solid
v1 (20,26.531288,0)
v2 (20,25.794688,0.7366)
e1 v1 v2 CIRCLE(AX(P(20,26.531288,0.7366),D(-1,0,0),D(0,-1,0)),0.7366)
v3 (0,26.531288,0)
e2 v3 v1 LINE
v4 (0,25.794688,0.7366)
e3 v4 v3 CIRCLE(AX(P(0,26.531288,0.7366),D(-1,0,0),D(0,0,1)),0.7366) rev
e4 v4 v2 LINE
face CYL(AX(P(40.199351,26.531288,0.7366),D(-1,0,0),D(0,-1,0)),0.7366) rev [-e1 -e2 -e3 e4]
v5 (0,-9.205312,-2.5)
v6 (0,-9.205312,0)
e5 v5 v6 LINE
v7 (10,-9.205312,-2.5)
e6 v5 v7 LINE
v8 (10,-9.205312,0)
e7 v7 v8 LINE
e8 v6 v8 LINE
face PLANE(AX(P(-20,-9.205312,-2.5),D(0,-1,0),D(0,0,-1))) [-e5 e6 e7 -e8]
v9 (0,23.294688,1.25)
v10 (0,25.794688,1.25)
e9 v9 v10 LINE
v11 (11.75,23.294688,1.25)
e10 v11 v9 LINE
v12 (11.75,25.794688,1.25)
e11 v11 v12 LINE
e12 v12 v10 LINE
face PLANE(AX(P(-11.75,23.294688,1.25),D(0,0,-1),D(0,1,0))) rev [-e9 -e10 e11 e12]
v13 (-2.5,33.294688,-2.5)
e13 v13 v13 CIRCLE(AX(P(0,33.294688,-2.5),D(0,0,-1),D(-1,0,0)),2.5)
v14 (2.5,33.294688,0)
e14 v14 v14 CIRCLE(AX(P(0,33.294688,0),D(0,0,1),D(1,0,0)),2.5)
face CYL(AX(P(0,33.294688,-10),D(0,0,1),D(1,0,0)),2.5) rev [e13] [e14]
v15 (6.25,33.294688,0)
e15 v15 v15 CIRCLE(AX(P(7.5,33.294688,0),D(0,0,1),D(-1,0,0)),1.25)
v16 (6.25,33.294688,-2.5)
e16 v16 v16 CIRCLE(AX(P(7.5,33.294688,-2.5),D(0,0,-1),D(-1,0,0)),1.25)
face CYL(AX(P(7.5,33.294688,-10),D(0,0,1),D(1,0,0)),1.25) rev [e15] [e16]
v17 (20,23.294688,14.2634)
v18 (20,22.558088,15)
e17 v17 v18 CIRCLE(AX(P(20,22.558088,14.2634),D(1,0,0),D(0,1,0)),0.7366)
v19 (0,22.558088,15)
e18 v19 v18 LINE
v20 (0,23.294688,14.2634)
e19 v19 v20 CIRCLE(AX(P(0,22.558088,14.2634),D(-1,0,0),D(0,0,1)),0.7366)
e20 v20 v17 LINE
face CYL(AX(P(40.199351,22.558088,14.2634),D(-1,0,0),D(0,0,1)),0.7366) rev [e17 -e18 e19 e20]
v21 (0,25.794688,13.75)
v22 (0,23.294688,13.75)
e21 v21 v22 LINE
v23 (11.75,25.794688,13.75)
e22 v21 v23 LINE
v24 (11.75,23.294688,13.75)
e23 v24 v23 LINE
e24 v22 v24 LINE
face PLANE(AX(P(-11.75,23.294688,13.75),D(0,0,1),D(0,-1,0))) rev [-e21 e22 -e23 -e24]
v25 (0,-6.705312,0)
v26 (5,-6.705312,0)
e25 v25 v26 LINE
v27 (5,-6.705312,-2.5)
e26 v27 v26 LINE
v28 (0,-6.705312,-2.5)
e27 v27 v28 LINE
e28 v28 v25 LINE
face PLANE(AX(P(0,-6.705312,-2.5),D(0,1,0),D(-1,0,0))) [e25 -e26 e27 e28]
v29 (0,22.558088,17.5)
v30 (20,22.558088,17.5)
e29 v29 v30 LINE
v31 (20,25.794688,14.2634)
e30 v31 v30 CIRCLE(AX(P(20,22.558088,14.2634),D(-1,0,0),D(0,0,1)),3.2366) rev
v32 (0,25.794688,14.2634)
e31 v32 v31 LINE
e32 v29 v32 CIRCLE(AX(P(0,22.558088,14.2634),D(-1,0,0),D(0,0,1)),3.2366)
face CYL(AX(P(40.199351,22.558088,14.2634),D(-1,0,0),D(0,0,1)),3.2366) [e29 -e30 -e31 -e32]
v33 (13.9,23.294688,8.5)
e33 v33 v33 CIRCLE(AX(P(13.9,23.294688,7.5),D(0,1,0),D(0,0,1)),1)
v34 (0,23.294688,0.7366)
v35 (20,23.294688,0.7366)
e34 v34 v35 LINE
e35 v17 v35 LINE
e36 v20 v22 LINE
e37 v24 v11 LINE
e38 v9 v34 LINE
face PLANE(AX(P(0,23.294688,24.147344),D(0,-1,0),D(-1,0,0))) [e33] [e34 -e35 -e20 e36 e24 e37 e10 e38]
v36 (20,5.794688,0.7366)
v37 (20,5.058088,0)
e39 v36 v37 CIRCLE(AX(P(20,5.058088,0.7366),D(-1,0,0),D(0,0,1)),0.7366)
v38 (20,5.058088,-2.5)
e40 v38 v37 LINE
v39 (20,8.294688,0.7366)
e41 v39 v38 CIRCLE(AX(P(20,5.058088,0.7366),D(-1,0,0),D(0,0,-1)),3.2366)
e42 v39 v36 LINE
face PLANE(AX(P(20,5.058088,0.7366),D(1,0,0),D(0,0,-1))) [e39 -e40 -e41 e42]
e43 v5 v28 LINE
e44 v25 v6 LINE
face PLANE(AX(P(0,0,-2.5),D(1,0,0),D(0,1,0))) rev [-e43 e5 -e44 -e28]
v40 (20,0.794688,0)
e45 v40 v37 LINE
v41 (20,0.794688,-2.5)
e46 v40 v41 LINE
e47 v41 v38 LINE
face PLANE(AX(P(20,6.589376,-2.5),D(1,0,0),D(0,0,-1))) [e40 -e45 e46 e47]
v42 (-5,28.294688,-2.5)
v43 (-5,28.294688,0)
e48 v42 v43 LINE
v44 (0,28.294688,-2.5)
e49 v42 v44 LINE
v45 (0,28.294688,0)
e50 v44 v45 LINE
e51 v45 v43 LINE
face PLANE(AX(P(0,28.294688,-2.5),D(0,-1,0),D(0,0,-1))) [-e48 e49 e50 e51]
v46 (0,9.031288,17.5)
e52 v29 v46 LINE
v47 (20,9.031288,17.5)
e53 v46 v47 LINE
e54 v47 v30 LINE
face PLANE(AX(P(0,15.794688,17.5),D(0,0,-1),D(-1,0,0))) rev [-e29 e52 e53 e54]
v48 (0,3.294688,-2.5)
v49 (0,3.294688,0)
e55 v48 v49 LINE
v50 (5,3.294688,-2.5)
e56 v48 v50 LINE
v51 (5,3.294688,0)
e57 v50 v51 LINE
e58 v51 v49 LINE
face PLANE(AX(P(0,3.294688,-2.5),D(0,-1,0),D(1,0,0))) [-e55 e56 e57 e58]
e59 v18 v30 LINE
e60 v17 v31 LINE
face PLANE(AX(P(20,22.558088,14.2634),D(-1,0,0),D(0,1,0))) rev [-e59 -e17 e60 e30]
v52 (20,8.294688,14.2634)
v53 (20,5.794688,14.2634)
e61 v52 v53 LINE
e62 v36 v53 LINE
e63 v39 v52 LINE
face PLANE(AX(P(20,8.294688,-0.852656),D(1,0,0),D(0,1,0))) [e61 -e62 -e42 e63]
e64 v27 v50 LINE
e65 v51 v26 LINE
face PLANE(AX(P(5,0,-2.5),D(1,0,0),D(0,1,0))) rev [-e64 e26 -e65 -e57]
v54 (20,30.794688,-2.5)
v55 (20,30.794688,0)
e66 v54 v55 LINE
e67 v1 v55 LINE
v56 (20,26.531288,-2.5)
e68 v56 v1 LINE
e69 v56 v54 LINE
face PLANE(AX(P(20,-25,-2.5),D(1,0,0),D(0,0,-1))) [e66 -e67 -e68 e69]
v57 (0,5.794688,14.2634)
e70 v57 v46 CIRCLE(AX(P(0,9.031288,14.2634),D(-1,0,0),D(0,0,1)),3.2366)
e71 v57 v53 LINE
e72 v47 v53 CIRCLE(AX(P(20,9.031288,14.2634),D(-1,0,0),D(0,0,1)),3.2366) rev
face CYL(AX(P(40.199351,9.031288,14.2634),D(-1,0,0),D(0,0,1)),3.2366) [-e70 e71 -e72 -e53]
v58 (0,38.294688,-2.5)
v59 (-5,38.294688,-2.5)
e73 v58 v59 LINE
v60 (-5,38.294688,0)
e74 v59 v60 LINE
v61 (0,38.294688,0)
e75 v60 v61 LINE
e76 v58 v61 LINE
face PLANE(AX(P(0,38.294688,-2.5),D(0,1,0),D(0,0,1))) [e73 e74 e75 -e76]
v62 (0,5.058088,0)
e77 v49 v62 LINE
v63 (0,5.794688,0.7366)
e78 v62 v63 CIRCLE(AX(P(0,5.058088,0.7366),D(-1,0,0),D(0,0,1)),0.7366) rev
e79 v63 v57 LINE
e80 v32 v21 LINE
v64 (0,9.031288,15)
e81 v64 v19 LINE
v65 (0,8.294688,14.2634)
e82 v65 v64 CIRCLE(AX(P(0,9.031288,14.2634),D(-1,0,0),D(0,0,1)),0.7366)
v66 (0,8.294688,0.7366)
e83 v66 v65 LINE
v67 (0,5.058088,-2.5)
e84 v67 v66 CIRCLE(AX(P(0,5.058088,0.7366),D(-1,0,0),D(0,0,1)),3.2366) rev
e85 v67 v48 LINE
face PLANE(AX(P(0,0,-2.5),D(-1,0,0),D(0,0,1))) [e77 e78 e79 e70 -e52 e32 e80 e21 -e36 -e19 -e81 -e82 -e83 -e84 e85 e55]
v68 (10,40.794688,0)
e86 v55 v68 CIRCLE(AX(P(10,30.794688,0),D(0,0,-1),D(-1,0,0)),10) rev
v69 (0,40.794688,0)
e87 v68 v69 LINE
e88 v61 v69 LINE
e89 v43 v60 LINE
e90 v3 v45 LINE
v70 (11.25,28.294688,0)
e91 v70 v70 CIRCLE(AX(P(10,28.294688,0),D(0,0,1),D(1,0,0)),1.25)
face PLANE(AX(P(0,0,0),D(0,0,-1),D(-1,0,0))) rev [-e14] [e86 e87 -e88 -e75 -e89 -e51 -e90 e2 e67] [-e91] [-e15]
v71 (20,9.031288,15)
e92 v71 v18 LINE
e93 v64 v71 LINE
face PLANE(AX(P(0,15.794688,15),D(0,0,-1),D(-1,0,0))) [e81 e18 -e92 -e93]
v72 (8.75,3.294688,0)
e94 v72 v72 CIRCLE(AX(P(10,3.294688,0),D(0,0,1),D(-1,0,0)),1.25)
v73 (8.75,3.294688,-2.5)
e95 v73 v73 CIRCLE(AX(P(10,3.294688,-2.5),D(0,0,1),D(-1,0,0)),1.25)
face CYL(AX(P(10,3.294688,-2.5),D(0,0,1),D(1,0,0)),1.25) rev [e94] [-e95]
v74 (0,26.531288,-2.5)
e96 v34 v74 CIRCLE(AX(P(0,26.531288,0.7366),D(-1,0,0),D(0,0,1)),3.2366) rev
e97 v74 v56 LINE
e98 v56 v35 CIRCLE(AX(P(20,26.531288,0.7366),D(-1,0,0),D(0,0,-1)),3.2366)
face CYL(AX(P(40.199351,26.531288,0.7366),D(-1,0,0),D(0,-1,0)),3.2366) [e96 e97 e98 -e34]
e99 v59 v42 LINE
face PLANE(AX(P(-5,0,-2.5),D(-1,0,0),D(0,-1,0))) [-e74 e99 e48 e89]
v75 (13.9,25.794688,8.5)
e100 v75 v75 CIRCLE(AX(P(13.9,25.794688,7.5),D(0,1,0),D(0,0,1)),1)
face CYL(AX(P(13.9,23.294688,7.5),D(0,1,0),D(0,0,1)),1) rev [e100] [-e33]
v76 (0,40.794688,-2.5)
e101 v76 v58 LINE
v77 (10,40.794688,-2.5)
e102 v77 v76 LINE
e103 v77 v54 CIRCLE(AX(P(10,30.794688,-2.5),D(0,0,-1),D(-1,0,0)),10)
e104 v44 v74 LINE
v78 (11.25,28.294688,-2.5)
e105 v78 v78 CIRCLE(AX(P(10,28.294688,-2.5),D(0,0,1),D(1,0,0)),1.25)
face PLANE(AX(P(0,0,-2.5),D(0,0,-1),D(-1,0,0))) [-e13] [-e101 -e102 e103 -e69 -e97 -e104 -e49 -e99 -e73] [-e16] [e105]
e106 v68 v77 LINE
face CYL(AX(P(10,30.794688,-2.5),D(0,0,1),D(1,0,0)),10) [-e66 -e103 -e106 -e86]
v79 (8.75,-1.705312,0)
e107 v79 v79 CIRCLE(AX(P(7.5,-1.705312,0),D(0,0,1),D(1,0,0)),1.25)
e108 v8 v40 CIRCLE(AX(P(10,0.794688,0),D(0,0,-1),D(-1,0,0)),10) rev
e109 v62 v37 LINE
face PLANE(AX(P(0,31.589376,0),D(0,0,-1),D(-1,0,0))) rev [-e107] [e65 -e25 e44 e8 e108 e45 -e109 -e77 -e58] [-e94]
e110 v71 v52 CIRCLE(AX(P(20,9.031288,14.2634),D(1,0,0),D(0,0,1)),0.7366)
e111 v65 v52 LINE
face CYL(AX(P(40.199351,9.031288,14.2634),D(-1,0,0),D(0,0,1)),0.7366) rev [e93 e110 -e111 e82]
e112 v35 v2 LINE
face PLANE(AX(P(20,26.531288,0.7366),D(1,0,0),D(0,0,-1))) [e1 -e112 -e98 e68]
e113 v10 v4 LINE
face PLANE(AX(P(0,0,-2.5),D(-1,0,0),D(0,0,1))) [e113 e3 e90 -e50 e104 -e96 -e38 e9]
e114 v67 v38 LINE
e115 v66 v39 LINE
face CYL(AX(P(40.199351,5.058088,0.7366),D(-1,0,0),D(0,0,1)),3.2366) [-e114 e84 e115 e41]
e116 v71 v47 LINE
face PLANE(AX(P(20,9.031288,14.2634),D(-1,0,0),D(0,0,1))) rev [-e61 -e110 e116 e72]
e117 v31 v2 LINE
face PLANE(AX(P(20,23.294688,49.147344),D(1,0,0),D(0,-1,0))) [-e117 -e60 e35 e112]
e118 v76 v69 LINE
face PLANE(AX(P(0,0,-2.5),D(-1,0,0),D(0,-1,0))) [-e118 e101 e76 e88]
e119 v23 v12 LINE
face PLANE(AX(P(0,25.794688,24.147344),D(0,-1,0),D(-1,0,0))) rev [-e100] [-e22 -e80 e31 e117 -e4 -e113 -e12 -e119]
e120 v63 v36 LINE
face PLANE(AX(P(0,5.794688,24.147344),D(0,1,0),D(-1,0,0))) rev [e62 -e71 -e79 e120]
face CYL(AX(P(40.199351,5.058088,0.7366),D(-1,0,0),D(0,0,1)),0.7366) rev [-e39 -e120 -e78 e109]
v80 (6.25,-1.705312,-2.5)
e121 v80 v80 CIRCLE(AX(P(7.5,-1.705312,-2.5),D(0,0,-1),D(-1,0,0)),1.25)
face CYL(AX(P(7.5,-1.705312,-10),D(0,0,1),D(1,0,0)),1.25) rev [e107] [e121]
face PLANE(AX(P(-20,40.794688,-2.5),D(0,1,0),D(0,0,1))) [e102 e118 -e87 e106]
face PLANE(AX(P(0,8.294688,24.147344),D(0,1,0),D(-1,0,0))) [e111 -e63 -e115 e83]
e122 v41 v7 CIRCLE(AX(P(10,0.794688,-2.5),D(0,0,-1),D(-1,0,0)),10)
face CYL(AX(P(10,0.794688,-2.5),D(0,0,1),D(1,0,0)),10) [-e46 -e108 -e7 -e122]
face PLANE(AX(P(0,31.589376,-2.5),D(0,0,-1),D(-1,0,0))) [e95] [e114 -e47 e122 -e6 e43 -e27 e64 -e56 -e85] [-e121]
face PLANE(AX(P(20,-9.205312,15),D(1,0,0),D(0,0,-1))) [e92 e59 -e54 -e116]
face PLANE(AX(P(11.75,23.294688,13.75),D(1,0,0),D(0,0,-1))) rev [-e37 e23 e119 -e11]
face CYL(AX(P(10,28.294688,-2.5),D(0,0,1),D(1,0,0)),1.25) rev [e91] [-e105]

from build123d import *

# Parameters (mm, degrees)
SKETCH1_W           = 40
SKETCH1_H           = 50
SKETCH1_R           = 1.25
BASE_FLANGE1_DEPTH  = 2.5
SKETCH15_R          = 1
CUT_EXTRUDE3_DEPTH  = 10
JOG3_START          = -2.5
JOG3_OUTLINE_W      = 40
JOG3_OUTLINE_H      = 48.294687966
JOG3_OUTLINE_R      = 1
JOG3_OUTLINE_R_2    = 1.25
JOG3_DEPTH          = 2.5
JOG3_2_OUTLINE_W    = 40
JOG3_2_OUTLINE_H    = 1.705312034
JOG3_2_DEPTH        = 0.332528284
JOG3_START_2        = 14.2634
JOG3_3_OUTLINE_W    = 40
JOG3_3_OUTLINE_H    = 35
JOG3_3_OUTLINE_R    = 1
JOG3_3_OUTLINE_R_2  = 1.25
JOG3_3_DEPTH        = 3.2366
JOG3_4_OUTLINE_W    = 40
JOG3_4_OUTLINE_H    = 15.794687966
JOG3_4_OUTLINE_R    = 1.25
JOG3_4_DEPTH        = 3.2366
JOG3_5_OUTLINE_W    = 40
JOG3_5_OUTLINE_H    = 2.5
JOG3_5_DEPTH        = 15
JOG3_START_3        = 15
JOG3_6_OUTLINE_R    = 1.25
JOG3_6_OUTLINE_R_2  = 1
JOG3_6_DEPTH        = 2.5
JOG3_START_4        = -20
JOG3_7_DEPTH        = 40
JOG4_START          = -20
JOG4_DEPTH          = 40
JOG4_2_DEPTH        = 40
JOG4_START_2        = -3
JOG4_3_OUTLINE_R    = 1.25
JOG4_3_DEPTH        = 4
FILLET1_R           = 10
SKETCH18_R          = 2.5
BOSS_EXTRUDE1_DEPTH = 2.5
SKETCH19_R          = 1
SKETCH19_W          = 23.5
SKETCH19_H          = 12.5
CUT_EXTRUDE4_DEPTH  = 2.5
SKETCH20_R          = 2.5
SKETCH20_R_2        = 1.25
CUT_EXTRUDE6_DEPTH  = 10
SKETCH23_R          = 2.5
CUT_EXTRUDE7_DEPTH  = 44.945989578
SKETCH24_R          = 5
CUT_EXTRUDE8_DEPTH  = 1.25
SKETCH25_W          = 20
SKETCH25_H          = 13.5268
CUT_EXTRUDE11_DEPTH = 50.640775238


with BuildPart() as part:
    # Base-Flange1: sheet metal written as solids
    # Sketch1 → Base-Flange1 (new body)
    with BuildSketch(Plane.XY):
        Rectangle(SKETCH1_W, SKETCH1_H)
        with Locations((10, 12.5)):
            Circle(SKETCH1_R, mode=Mode.SUBTRACT)
        with Locations(Location((10, -12.5, 0), (0, 0, 180))):
            Circle(SKETCH1_R, mode=Mode.SUBTRACT)
        with Locations((-10, -12.5)):
            Circle(SKETCH1_R, mode=Mode.SUBTRACT)
        with Locations(Location((-10, 12.5, 0), (0, 0, 180))):
            Circle(SKETCH1_R, mode=Mode.SUBTRACT)
    extrude(amount=-BASE_FLANGE1_DEPTH)

    # Sketch15 → Cut-Extrude3 (cut)
    with BuildSketch(Plane.XY):
        with Locations((12, 0)):
            Circle(SKETCH15_R)
        with Locations(Location((-17, 0, 0), (0, 0, 180))):
            Circle(SKETCH15_R)
    extrude(amount=-CUT_EXTRUDE3_DEPTH, mode=Mode.SUBTRACT)

    # Jog3: read off the stored shape, not the designer's step
    # Jog3 outline → Jog3 (cut)
    with BuildSketch(Plane.XY.offset(JOG3_START)):
        with Locations((0, -0.852656017)):
            Rectangle(JOG3_OUTLINE_W, JOG3_OUTLINE_H)
        with Locations((-17, 0)):
            Circle(JOG3_OUTLINE_R, mode=Mode.SUBTRACT)
        with Locations((12, 0)):
            Circle(JOG3_OUTLINE_R, mode=Mode.SUBTRACT)
        with Locations((-10, 12.5)):
            Circle(JOG3_OUTLINE_R_2, mode=Mode.SUBTRACT)
        with Locations((10, 12.5)):
            Circle(JOG3_OUTLINE_R_2, mode=Mode.SUBTRACT)
        with Locations((10, -12.5)):
            Circle(JOG3_OUTLINE_R_2, mode=Mode.SUBTRACT)
        with Locations((-10, -12.5)):
            Circle(JOG3_OUTLINE_R_2, mode=Mode.SUBTRACT)
    extrude(amount=JOG3_DEPTH, mode=Mode.SUBTRACT)

    # Jog3 2 outline → Jog3 2 (cut)
    with BuildSketch(Plane.XY.offset(JOG3_START)):
        with Locations((0, 24.147343983)):
            Rectangle(JOG3_2_OUTLINE_W, JOG3_2_OUTLINE_H)
    extrude(amount=JOG3_2_DEPTH, mode=Mode.SUBTRACT)

    # Jog3 4 outline → Jog3 4 (add)
    with BuildSketch(Plane.XY.offset(JOG3_START)):
        with Locations((0, 32.897343983)):
            Rectangle(JOG3_4_OUTLINE_W, JOG3_4_OUTLINE_H)
        with Locations((10, 28.294687966)):
            Circle(JOG3_4_OUTLINE_R, mode=Mode.SUBTRACT)
        with Locations((-10, 28.294687966)):
            Circle(JOG3_4_OUTLINE_R, mode=Mode.SUBTRACT)
    extrude(amount=JOG3_4_DEPTH)



with BuildPart() as body_2:
    # Jog3 3 outline → Jog3 3 (new body)
    with BuildSketch(Plane.XY.offset(JOG3_START_2)):
        with Locations((0, 8.294687966)):
            Rectangle(JOG3_3_OUTLINE_W, JOG3_3_OUTLINE_H)
        with Locations((12, 15.794687966)):
            Circle(JOG3_3_OUTLINE_R, mode=Mode.SUBTRACT)
        with Locations((-17, 0)):
            Circle(JOG3_3_OUTLINE_R, mode=Mode.SUBTRACT)
        with Locations((-10, 3.294687966)):
            Circle(JOG3_3_OUTLINE_R_2, mode=Mode.SUBTRACT)
        with Locations((12, 0)):
            Circle(JOG3_3_OUTLINE_R, mode=Mode.SUBTRACT)
        with Locations((10, 3.294687966)):
            Circle(JOG3_3_OUTLINE_R_2, mode=Mode.SUBTRACT)
        with Locations((-17, 15.794687966)):
            Circle(JOG3_3_OUTLINE_R, mode=Mode.SUBTRACT)
        with Locations((-10, 12.5)):
            Circle(JOG3_3_OUTLINE_R_2, mode=Mode.SUBTRACT)
        with Locations((10, 12.5)):
            Circle(JOG3_3_OUTLINE_R_2, mode=Mode.SUBTRACT)
    extrude(amount=JOG3_3_DEPTH)


with BuildPart() as part_1:
    add(part.part)

    add(body_2.part)  # Jog3 5 merges body 2
    # Jog3 5 outline → Jog3 5 (add)
    with BuildSketch(Plane.XY):
        with Locations((0, 24.544687966)):
            Rectangle(JOG3_5_OUTLINE_W, JOG3_5_OUTLINE_H)
    extrude(amount=JOG3_5_DEPTH)

    # Jog3 6 outline → Jog3 6 (add)
    with BuildSketch(Plane.XY.offset(JOG3_START_3)):
        with Locations((10, 12.5)):
            Circle(JOG3_6_OUTLINE_R)
        with Locations((-10, 12.5)):
            Circle(JOG3_6_OUTLINE_R)
        with Locations((12, 0)):
            Circle(JOG3_6_OUTLINE_R_2)
        with Locations((-17, 0)):
            Circle(JOG3_6_OUTLINE_R_2)
    extrude(amount=JOG3_6_DEPTH)

    # Jog3 7 outline → Jog3 7 (cut)
    with BuildSketch(Plane.YZ.offset(JOG3_START_4)):
        with BuildLine():
            ThreePointArc((23.294687966, 14.2634), (23.078942821, 14.784254855), (22.558087966, 15))
            Line((22.558087966, 15), (-9.205312034, 15))
            Line((-9.205312034, 15), (-9.205312034, 14.2634))
            Line((-9.205312034, 14.2634), (23.294687966, 14.2634))
        make_face()
        with BuildLine():
            ThreePointArc((26.531287966, -2.5), (24.242666158, -1.552021808), (23.294687966, 0.7366))
            Line((23.294687966, 0.7366), (23.294687966, -2.167471716))
            Line((23.294687966, -2.167471716), (25, -2.167471716))
            Line((25, -2.167471716), (25, -2.5))
            Line((25, -2.5), (26.531287966, -2.5))
        make_face()
        with BuildLine():
            Line((26.531287966, 0), (40.794687966, 0))
            Line((40.794687966, 0), (40.794687966, 0.7366))
            Line((40.794687966, 0.7366), (25.794687966, 0.7366))
            ThreePointArc((25.794687966, 0.7366), (26.010433111, 0.215745145), (26.531287966, 0))
        make_face()
        with BuildLine():
            Line((25.794687966, 17.5), (22.558087966, 17.5))
            ThreePointArc((22.558087966, 17.5), (24.846709774, 16.552021808), (25.794687966, 14.2634))
            Line((25.794687966, 14.2634), (25.794687966, 17.5))
        make_face()
    extrude(amount=JOG3_7_DEPTH, mode=Mode.SUBTRACT)

    # Jog4: read off the stored shape, not the designer's step
    # Jog4 outline → Jog4 (cut)
    with BuildSketch(Plane.YZ.offset(JOG4_START)):
        with BuildLine():
            Line((-9.205312034, 15), (5.87962174, 15))
            ThreePointArc((5.87962174, 15), (7.019882984, 16.799110859), (9.031287966, 17.5))
            Line((9.031287966, 17.5), (-9.205312034, 17.5))
            Line((-9.205312034, 17.5), (-9.205312034, 15))
        make_face()
    extrude(amount=JOG4_DEPTH, mode=Mode.SUBTRACT)

    # Jog4 2 outline → Jog4 2 (add)
    with BuildSketch(Plane.YZ.offset(JOG4_START)):
        with BuildLine():
            Line((-9.205312034, 0), (-9.205312034, -2.5))
            Line((-9.205312034, -2.5), (5.058087966, -2.5))
            ThreePointArc((5.058087966, -2.5), (7.346709774, -1.552021808), (8.294687966, 0.7366))
            Line((8.294687966, 0.7366), (8.294687966, 14.2634))
            ThreePointArc((8.294687966, 14.2634), (8.510433111, 14.784254855), (9.031287966, 15))
            Line((9.031287966, 15), (5.87962174, 15))
            ThreePointArc((5.87962174, 15), (5.81599152, 14.634140241), (5.794687966, 14.2634))
            Line((5.794687966, 14.2634), (5.794687966, 0.7366))
            ThreePointArc((5.794687966, 0.7366), (5.578942821, 0.215745145), (5.058087966, 0))
            Line((5.058087966, 0), (-9.205312034, 0))
        make_face()
    extrude(amount=JOG4_2_DEPTH)

    # Jog4 3 outline → Jog4 3 (cut)
    with BuildSketch(Plane.XY.offset(JOG4_START_2)):
        with Locations((-10, 3.294687966)):
            Circle(JOG4_3_OUTLINE_R)
        with Locations((10, 3.294687966)):
            Circle(JOG4_3_OUTLINE_R)
    extrude(amount=JOG4_3_DEPTH, mode=Mode.SUBTRACT)

    # Fillet1
    fillet1_edges = [part_1.edges().sort_by_distance(p)[0] for p in [
        (20, -9.205312034, -1.25),
        (-20, -9.205312034, -1.25),
        (-20, 40.794687966, -1.25),
        (20, 40.794687966, -1.25),
    ]]
    fillet(fillet1_edges, radius=FILLET1_R)

    # Sketch18 → Boss-Extrude1 (add)
    with BuildSketch(Plane.XY.offset(17.5)):
        with Locations((12, 15.794687966)):
            Circle(SKETCH18_R)
        with Locations((-17, 15.794687966)):
            Circle(SKETCH18_R)
    extrude(amount=-BOSS_EXTRUDE1_DEPTH)

    # Sketch19 → Cut-Extrude4 (cut)
    with BuildSketch(Plane(origin=(0, 25.794687966, 0), x_dir=(1, 0, 0), z_dir=(0, 1, 0))):
        with Locations(Location((13.9, -7.5, 0), (0, 0, 270))):
            Circle(SKETCH19_R)
        with Locations(Location((-13.9, -7.5, 0), (0, 0, 90))):
            Circle(SKETCH19_R)
        with Locations((0, -7.5)):
            Rectangle(SKETCH19_W, SKETCH19_H)
    extrude(amount=-CUT_EXTRUDE4_DEPTH, mode=Mode.SUBTRACT)

    # Sketch20 → Cut-Extrude6 (cut)
    with BuildSketch(Plane.XY):
        with Locations((0, 33.294687966)):
            Circle(SKETCH20_R)
        with Locations(Location((0, -1.705312034, 0), (0, 0, 180))):
            Circle(SKETCH20_R)
        with Locations((7.5, -1.705312034)):
            Circle(SKETCH20_R_2)
        with Locations(Location((-7.5, -1.705312034, 0), (0, 0, 180))):
            Circle(SKETCH20_R_2)
        with Locations(Location((7.5, 33.294687966, 0), (0, 0, 180))):
            Circle(SKETCH20_R_2)
        with Locations((-7.5, 33.294687966)):
            Circle(SKETCH20_R_2)
    extrude(amount=-CUT_EXTRUDE6_DEPTH, mode=Mode.SUBTRACT)

    # Sketch23 → Cut-Extrude7 (cut, through all)
    with BuildSketch(Plane(origin=(0, 25.794687966, 0), x_dir=(1, 0, 0), z_dir=(0, 1, 0))):
        with Locations(Location((-5.55, -7.5, 0), (0, 0, 270))):
            Circle(SKETCH23_R)
    extrude(amount=-CUT_EXTRUDE7_DEPTH, mode=Mode.SUBTRACT)

    # Sketch24 → Cut-Extrude8 (cut)
    with BuildSketch(Plane(origin=(0, 8.294687966, 0), x_dir=(1, 0, 0), z_dir=(0, 1, 0))):
        with Locations(Location((-5.55, -7.5, 0), (0, 0, 270))):
            Circle(SKETCH24_R)
    extrude(amount=-CUT_EXTRUDE8_DEPTH, mode=Mode.SUBTRACT)

    # Sketch25 → Cut-Extrude11 (cut, through all)
    with BuildSketch(Plane.XY.offset(17.5)):
        Polygon((0, 38.294687966), (0, 40.794687966), (-20, 40.794687966), (-20, 22.558087966), (0, 22.558087966), (0, 28.294687966), (-5, 28.294687966), (-5, 38.294687966), align=None)
        with Locations((-10, 15.794687966)):
            Rectangle(SKETCH25_W, SKETCH25_H)
        Polygon((0, 9.031287966), (-20, 9.031287966), (-20, -9.205312034), (0, -9.205312034), (0, -6.705312034), (5, -6.705312034), (5, 3.294687966), (0, 3.294687966), align=None)
    extrude(amount=-CUT_EXTRUDE11_DEPTH, mode=Mode.SUBTRACT)


solid = part_1.part
